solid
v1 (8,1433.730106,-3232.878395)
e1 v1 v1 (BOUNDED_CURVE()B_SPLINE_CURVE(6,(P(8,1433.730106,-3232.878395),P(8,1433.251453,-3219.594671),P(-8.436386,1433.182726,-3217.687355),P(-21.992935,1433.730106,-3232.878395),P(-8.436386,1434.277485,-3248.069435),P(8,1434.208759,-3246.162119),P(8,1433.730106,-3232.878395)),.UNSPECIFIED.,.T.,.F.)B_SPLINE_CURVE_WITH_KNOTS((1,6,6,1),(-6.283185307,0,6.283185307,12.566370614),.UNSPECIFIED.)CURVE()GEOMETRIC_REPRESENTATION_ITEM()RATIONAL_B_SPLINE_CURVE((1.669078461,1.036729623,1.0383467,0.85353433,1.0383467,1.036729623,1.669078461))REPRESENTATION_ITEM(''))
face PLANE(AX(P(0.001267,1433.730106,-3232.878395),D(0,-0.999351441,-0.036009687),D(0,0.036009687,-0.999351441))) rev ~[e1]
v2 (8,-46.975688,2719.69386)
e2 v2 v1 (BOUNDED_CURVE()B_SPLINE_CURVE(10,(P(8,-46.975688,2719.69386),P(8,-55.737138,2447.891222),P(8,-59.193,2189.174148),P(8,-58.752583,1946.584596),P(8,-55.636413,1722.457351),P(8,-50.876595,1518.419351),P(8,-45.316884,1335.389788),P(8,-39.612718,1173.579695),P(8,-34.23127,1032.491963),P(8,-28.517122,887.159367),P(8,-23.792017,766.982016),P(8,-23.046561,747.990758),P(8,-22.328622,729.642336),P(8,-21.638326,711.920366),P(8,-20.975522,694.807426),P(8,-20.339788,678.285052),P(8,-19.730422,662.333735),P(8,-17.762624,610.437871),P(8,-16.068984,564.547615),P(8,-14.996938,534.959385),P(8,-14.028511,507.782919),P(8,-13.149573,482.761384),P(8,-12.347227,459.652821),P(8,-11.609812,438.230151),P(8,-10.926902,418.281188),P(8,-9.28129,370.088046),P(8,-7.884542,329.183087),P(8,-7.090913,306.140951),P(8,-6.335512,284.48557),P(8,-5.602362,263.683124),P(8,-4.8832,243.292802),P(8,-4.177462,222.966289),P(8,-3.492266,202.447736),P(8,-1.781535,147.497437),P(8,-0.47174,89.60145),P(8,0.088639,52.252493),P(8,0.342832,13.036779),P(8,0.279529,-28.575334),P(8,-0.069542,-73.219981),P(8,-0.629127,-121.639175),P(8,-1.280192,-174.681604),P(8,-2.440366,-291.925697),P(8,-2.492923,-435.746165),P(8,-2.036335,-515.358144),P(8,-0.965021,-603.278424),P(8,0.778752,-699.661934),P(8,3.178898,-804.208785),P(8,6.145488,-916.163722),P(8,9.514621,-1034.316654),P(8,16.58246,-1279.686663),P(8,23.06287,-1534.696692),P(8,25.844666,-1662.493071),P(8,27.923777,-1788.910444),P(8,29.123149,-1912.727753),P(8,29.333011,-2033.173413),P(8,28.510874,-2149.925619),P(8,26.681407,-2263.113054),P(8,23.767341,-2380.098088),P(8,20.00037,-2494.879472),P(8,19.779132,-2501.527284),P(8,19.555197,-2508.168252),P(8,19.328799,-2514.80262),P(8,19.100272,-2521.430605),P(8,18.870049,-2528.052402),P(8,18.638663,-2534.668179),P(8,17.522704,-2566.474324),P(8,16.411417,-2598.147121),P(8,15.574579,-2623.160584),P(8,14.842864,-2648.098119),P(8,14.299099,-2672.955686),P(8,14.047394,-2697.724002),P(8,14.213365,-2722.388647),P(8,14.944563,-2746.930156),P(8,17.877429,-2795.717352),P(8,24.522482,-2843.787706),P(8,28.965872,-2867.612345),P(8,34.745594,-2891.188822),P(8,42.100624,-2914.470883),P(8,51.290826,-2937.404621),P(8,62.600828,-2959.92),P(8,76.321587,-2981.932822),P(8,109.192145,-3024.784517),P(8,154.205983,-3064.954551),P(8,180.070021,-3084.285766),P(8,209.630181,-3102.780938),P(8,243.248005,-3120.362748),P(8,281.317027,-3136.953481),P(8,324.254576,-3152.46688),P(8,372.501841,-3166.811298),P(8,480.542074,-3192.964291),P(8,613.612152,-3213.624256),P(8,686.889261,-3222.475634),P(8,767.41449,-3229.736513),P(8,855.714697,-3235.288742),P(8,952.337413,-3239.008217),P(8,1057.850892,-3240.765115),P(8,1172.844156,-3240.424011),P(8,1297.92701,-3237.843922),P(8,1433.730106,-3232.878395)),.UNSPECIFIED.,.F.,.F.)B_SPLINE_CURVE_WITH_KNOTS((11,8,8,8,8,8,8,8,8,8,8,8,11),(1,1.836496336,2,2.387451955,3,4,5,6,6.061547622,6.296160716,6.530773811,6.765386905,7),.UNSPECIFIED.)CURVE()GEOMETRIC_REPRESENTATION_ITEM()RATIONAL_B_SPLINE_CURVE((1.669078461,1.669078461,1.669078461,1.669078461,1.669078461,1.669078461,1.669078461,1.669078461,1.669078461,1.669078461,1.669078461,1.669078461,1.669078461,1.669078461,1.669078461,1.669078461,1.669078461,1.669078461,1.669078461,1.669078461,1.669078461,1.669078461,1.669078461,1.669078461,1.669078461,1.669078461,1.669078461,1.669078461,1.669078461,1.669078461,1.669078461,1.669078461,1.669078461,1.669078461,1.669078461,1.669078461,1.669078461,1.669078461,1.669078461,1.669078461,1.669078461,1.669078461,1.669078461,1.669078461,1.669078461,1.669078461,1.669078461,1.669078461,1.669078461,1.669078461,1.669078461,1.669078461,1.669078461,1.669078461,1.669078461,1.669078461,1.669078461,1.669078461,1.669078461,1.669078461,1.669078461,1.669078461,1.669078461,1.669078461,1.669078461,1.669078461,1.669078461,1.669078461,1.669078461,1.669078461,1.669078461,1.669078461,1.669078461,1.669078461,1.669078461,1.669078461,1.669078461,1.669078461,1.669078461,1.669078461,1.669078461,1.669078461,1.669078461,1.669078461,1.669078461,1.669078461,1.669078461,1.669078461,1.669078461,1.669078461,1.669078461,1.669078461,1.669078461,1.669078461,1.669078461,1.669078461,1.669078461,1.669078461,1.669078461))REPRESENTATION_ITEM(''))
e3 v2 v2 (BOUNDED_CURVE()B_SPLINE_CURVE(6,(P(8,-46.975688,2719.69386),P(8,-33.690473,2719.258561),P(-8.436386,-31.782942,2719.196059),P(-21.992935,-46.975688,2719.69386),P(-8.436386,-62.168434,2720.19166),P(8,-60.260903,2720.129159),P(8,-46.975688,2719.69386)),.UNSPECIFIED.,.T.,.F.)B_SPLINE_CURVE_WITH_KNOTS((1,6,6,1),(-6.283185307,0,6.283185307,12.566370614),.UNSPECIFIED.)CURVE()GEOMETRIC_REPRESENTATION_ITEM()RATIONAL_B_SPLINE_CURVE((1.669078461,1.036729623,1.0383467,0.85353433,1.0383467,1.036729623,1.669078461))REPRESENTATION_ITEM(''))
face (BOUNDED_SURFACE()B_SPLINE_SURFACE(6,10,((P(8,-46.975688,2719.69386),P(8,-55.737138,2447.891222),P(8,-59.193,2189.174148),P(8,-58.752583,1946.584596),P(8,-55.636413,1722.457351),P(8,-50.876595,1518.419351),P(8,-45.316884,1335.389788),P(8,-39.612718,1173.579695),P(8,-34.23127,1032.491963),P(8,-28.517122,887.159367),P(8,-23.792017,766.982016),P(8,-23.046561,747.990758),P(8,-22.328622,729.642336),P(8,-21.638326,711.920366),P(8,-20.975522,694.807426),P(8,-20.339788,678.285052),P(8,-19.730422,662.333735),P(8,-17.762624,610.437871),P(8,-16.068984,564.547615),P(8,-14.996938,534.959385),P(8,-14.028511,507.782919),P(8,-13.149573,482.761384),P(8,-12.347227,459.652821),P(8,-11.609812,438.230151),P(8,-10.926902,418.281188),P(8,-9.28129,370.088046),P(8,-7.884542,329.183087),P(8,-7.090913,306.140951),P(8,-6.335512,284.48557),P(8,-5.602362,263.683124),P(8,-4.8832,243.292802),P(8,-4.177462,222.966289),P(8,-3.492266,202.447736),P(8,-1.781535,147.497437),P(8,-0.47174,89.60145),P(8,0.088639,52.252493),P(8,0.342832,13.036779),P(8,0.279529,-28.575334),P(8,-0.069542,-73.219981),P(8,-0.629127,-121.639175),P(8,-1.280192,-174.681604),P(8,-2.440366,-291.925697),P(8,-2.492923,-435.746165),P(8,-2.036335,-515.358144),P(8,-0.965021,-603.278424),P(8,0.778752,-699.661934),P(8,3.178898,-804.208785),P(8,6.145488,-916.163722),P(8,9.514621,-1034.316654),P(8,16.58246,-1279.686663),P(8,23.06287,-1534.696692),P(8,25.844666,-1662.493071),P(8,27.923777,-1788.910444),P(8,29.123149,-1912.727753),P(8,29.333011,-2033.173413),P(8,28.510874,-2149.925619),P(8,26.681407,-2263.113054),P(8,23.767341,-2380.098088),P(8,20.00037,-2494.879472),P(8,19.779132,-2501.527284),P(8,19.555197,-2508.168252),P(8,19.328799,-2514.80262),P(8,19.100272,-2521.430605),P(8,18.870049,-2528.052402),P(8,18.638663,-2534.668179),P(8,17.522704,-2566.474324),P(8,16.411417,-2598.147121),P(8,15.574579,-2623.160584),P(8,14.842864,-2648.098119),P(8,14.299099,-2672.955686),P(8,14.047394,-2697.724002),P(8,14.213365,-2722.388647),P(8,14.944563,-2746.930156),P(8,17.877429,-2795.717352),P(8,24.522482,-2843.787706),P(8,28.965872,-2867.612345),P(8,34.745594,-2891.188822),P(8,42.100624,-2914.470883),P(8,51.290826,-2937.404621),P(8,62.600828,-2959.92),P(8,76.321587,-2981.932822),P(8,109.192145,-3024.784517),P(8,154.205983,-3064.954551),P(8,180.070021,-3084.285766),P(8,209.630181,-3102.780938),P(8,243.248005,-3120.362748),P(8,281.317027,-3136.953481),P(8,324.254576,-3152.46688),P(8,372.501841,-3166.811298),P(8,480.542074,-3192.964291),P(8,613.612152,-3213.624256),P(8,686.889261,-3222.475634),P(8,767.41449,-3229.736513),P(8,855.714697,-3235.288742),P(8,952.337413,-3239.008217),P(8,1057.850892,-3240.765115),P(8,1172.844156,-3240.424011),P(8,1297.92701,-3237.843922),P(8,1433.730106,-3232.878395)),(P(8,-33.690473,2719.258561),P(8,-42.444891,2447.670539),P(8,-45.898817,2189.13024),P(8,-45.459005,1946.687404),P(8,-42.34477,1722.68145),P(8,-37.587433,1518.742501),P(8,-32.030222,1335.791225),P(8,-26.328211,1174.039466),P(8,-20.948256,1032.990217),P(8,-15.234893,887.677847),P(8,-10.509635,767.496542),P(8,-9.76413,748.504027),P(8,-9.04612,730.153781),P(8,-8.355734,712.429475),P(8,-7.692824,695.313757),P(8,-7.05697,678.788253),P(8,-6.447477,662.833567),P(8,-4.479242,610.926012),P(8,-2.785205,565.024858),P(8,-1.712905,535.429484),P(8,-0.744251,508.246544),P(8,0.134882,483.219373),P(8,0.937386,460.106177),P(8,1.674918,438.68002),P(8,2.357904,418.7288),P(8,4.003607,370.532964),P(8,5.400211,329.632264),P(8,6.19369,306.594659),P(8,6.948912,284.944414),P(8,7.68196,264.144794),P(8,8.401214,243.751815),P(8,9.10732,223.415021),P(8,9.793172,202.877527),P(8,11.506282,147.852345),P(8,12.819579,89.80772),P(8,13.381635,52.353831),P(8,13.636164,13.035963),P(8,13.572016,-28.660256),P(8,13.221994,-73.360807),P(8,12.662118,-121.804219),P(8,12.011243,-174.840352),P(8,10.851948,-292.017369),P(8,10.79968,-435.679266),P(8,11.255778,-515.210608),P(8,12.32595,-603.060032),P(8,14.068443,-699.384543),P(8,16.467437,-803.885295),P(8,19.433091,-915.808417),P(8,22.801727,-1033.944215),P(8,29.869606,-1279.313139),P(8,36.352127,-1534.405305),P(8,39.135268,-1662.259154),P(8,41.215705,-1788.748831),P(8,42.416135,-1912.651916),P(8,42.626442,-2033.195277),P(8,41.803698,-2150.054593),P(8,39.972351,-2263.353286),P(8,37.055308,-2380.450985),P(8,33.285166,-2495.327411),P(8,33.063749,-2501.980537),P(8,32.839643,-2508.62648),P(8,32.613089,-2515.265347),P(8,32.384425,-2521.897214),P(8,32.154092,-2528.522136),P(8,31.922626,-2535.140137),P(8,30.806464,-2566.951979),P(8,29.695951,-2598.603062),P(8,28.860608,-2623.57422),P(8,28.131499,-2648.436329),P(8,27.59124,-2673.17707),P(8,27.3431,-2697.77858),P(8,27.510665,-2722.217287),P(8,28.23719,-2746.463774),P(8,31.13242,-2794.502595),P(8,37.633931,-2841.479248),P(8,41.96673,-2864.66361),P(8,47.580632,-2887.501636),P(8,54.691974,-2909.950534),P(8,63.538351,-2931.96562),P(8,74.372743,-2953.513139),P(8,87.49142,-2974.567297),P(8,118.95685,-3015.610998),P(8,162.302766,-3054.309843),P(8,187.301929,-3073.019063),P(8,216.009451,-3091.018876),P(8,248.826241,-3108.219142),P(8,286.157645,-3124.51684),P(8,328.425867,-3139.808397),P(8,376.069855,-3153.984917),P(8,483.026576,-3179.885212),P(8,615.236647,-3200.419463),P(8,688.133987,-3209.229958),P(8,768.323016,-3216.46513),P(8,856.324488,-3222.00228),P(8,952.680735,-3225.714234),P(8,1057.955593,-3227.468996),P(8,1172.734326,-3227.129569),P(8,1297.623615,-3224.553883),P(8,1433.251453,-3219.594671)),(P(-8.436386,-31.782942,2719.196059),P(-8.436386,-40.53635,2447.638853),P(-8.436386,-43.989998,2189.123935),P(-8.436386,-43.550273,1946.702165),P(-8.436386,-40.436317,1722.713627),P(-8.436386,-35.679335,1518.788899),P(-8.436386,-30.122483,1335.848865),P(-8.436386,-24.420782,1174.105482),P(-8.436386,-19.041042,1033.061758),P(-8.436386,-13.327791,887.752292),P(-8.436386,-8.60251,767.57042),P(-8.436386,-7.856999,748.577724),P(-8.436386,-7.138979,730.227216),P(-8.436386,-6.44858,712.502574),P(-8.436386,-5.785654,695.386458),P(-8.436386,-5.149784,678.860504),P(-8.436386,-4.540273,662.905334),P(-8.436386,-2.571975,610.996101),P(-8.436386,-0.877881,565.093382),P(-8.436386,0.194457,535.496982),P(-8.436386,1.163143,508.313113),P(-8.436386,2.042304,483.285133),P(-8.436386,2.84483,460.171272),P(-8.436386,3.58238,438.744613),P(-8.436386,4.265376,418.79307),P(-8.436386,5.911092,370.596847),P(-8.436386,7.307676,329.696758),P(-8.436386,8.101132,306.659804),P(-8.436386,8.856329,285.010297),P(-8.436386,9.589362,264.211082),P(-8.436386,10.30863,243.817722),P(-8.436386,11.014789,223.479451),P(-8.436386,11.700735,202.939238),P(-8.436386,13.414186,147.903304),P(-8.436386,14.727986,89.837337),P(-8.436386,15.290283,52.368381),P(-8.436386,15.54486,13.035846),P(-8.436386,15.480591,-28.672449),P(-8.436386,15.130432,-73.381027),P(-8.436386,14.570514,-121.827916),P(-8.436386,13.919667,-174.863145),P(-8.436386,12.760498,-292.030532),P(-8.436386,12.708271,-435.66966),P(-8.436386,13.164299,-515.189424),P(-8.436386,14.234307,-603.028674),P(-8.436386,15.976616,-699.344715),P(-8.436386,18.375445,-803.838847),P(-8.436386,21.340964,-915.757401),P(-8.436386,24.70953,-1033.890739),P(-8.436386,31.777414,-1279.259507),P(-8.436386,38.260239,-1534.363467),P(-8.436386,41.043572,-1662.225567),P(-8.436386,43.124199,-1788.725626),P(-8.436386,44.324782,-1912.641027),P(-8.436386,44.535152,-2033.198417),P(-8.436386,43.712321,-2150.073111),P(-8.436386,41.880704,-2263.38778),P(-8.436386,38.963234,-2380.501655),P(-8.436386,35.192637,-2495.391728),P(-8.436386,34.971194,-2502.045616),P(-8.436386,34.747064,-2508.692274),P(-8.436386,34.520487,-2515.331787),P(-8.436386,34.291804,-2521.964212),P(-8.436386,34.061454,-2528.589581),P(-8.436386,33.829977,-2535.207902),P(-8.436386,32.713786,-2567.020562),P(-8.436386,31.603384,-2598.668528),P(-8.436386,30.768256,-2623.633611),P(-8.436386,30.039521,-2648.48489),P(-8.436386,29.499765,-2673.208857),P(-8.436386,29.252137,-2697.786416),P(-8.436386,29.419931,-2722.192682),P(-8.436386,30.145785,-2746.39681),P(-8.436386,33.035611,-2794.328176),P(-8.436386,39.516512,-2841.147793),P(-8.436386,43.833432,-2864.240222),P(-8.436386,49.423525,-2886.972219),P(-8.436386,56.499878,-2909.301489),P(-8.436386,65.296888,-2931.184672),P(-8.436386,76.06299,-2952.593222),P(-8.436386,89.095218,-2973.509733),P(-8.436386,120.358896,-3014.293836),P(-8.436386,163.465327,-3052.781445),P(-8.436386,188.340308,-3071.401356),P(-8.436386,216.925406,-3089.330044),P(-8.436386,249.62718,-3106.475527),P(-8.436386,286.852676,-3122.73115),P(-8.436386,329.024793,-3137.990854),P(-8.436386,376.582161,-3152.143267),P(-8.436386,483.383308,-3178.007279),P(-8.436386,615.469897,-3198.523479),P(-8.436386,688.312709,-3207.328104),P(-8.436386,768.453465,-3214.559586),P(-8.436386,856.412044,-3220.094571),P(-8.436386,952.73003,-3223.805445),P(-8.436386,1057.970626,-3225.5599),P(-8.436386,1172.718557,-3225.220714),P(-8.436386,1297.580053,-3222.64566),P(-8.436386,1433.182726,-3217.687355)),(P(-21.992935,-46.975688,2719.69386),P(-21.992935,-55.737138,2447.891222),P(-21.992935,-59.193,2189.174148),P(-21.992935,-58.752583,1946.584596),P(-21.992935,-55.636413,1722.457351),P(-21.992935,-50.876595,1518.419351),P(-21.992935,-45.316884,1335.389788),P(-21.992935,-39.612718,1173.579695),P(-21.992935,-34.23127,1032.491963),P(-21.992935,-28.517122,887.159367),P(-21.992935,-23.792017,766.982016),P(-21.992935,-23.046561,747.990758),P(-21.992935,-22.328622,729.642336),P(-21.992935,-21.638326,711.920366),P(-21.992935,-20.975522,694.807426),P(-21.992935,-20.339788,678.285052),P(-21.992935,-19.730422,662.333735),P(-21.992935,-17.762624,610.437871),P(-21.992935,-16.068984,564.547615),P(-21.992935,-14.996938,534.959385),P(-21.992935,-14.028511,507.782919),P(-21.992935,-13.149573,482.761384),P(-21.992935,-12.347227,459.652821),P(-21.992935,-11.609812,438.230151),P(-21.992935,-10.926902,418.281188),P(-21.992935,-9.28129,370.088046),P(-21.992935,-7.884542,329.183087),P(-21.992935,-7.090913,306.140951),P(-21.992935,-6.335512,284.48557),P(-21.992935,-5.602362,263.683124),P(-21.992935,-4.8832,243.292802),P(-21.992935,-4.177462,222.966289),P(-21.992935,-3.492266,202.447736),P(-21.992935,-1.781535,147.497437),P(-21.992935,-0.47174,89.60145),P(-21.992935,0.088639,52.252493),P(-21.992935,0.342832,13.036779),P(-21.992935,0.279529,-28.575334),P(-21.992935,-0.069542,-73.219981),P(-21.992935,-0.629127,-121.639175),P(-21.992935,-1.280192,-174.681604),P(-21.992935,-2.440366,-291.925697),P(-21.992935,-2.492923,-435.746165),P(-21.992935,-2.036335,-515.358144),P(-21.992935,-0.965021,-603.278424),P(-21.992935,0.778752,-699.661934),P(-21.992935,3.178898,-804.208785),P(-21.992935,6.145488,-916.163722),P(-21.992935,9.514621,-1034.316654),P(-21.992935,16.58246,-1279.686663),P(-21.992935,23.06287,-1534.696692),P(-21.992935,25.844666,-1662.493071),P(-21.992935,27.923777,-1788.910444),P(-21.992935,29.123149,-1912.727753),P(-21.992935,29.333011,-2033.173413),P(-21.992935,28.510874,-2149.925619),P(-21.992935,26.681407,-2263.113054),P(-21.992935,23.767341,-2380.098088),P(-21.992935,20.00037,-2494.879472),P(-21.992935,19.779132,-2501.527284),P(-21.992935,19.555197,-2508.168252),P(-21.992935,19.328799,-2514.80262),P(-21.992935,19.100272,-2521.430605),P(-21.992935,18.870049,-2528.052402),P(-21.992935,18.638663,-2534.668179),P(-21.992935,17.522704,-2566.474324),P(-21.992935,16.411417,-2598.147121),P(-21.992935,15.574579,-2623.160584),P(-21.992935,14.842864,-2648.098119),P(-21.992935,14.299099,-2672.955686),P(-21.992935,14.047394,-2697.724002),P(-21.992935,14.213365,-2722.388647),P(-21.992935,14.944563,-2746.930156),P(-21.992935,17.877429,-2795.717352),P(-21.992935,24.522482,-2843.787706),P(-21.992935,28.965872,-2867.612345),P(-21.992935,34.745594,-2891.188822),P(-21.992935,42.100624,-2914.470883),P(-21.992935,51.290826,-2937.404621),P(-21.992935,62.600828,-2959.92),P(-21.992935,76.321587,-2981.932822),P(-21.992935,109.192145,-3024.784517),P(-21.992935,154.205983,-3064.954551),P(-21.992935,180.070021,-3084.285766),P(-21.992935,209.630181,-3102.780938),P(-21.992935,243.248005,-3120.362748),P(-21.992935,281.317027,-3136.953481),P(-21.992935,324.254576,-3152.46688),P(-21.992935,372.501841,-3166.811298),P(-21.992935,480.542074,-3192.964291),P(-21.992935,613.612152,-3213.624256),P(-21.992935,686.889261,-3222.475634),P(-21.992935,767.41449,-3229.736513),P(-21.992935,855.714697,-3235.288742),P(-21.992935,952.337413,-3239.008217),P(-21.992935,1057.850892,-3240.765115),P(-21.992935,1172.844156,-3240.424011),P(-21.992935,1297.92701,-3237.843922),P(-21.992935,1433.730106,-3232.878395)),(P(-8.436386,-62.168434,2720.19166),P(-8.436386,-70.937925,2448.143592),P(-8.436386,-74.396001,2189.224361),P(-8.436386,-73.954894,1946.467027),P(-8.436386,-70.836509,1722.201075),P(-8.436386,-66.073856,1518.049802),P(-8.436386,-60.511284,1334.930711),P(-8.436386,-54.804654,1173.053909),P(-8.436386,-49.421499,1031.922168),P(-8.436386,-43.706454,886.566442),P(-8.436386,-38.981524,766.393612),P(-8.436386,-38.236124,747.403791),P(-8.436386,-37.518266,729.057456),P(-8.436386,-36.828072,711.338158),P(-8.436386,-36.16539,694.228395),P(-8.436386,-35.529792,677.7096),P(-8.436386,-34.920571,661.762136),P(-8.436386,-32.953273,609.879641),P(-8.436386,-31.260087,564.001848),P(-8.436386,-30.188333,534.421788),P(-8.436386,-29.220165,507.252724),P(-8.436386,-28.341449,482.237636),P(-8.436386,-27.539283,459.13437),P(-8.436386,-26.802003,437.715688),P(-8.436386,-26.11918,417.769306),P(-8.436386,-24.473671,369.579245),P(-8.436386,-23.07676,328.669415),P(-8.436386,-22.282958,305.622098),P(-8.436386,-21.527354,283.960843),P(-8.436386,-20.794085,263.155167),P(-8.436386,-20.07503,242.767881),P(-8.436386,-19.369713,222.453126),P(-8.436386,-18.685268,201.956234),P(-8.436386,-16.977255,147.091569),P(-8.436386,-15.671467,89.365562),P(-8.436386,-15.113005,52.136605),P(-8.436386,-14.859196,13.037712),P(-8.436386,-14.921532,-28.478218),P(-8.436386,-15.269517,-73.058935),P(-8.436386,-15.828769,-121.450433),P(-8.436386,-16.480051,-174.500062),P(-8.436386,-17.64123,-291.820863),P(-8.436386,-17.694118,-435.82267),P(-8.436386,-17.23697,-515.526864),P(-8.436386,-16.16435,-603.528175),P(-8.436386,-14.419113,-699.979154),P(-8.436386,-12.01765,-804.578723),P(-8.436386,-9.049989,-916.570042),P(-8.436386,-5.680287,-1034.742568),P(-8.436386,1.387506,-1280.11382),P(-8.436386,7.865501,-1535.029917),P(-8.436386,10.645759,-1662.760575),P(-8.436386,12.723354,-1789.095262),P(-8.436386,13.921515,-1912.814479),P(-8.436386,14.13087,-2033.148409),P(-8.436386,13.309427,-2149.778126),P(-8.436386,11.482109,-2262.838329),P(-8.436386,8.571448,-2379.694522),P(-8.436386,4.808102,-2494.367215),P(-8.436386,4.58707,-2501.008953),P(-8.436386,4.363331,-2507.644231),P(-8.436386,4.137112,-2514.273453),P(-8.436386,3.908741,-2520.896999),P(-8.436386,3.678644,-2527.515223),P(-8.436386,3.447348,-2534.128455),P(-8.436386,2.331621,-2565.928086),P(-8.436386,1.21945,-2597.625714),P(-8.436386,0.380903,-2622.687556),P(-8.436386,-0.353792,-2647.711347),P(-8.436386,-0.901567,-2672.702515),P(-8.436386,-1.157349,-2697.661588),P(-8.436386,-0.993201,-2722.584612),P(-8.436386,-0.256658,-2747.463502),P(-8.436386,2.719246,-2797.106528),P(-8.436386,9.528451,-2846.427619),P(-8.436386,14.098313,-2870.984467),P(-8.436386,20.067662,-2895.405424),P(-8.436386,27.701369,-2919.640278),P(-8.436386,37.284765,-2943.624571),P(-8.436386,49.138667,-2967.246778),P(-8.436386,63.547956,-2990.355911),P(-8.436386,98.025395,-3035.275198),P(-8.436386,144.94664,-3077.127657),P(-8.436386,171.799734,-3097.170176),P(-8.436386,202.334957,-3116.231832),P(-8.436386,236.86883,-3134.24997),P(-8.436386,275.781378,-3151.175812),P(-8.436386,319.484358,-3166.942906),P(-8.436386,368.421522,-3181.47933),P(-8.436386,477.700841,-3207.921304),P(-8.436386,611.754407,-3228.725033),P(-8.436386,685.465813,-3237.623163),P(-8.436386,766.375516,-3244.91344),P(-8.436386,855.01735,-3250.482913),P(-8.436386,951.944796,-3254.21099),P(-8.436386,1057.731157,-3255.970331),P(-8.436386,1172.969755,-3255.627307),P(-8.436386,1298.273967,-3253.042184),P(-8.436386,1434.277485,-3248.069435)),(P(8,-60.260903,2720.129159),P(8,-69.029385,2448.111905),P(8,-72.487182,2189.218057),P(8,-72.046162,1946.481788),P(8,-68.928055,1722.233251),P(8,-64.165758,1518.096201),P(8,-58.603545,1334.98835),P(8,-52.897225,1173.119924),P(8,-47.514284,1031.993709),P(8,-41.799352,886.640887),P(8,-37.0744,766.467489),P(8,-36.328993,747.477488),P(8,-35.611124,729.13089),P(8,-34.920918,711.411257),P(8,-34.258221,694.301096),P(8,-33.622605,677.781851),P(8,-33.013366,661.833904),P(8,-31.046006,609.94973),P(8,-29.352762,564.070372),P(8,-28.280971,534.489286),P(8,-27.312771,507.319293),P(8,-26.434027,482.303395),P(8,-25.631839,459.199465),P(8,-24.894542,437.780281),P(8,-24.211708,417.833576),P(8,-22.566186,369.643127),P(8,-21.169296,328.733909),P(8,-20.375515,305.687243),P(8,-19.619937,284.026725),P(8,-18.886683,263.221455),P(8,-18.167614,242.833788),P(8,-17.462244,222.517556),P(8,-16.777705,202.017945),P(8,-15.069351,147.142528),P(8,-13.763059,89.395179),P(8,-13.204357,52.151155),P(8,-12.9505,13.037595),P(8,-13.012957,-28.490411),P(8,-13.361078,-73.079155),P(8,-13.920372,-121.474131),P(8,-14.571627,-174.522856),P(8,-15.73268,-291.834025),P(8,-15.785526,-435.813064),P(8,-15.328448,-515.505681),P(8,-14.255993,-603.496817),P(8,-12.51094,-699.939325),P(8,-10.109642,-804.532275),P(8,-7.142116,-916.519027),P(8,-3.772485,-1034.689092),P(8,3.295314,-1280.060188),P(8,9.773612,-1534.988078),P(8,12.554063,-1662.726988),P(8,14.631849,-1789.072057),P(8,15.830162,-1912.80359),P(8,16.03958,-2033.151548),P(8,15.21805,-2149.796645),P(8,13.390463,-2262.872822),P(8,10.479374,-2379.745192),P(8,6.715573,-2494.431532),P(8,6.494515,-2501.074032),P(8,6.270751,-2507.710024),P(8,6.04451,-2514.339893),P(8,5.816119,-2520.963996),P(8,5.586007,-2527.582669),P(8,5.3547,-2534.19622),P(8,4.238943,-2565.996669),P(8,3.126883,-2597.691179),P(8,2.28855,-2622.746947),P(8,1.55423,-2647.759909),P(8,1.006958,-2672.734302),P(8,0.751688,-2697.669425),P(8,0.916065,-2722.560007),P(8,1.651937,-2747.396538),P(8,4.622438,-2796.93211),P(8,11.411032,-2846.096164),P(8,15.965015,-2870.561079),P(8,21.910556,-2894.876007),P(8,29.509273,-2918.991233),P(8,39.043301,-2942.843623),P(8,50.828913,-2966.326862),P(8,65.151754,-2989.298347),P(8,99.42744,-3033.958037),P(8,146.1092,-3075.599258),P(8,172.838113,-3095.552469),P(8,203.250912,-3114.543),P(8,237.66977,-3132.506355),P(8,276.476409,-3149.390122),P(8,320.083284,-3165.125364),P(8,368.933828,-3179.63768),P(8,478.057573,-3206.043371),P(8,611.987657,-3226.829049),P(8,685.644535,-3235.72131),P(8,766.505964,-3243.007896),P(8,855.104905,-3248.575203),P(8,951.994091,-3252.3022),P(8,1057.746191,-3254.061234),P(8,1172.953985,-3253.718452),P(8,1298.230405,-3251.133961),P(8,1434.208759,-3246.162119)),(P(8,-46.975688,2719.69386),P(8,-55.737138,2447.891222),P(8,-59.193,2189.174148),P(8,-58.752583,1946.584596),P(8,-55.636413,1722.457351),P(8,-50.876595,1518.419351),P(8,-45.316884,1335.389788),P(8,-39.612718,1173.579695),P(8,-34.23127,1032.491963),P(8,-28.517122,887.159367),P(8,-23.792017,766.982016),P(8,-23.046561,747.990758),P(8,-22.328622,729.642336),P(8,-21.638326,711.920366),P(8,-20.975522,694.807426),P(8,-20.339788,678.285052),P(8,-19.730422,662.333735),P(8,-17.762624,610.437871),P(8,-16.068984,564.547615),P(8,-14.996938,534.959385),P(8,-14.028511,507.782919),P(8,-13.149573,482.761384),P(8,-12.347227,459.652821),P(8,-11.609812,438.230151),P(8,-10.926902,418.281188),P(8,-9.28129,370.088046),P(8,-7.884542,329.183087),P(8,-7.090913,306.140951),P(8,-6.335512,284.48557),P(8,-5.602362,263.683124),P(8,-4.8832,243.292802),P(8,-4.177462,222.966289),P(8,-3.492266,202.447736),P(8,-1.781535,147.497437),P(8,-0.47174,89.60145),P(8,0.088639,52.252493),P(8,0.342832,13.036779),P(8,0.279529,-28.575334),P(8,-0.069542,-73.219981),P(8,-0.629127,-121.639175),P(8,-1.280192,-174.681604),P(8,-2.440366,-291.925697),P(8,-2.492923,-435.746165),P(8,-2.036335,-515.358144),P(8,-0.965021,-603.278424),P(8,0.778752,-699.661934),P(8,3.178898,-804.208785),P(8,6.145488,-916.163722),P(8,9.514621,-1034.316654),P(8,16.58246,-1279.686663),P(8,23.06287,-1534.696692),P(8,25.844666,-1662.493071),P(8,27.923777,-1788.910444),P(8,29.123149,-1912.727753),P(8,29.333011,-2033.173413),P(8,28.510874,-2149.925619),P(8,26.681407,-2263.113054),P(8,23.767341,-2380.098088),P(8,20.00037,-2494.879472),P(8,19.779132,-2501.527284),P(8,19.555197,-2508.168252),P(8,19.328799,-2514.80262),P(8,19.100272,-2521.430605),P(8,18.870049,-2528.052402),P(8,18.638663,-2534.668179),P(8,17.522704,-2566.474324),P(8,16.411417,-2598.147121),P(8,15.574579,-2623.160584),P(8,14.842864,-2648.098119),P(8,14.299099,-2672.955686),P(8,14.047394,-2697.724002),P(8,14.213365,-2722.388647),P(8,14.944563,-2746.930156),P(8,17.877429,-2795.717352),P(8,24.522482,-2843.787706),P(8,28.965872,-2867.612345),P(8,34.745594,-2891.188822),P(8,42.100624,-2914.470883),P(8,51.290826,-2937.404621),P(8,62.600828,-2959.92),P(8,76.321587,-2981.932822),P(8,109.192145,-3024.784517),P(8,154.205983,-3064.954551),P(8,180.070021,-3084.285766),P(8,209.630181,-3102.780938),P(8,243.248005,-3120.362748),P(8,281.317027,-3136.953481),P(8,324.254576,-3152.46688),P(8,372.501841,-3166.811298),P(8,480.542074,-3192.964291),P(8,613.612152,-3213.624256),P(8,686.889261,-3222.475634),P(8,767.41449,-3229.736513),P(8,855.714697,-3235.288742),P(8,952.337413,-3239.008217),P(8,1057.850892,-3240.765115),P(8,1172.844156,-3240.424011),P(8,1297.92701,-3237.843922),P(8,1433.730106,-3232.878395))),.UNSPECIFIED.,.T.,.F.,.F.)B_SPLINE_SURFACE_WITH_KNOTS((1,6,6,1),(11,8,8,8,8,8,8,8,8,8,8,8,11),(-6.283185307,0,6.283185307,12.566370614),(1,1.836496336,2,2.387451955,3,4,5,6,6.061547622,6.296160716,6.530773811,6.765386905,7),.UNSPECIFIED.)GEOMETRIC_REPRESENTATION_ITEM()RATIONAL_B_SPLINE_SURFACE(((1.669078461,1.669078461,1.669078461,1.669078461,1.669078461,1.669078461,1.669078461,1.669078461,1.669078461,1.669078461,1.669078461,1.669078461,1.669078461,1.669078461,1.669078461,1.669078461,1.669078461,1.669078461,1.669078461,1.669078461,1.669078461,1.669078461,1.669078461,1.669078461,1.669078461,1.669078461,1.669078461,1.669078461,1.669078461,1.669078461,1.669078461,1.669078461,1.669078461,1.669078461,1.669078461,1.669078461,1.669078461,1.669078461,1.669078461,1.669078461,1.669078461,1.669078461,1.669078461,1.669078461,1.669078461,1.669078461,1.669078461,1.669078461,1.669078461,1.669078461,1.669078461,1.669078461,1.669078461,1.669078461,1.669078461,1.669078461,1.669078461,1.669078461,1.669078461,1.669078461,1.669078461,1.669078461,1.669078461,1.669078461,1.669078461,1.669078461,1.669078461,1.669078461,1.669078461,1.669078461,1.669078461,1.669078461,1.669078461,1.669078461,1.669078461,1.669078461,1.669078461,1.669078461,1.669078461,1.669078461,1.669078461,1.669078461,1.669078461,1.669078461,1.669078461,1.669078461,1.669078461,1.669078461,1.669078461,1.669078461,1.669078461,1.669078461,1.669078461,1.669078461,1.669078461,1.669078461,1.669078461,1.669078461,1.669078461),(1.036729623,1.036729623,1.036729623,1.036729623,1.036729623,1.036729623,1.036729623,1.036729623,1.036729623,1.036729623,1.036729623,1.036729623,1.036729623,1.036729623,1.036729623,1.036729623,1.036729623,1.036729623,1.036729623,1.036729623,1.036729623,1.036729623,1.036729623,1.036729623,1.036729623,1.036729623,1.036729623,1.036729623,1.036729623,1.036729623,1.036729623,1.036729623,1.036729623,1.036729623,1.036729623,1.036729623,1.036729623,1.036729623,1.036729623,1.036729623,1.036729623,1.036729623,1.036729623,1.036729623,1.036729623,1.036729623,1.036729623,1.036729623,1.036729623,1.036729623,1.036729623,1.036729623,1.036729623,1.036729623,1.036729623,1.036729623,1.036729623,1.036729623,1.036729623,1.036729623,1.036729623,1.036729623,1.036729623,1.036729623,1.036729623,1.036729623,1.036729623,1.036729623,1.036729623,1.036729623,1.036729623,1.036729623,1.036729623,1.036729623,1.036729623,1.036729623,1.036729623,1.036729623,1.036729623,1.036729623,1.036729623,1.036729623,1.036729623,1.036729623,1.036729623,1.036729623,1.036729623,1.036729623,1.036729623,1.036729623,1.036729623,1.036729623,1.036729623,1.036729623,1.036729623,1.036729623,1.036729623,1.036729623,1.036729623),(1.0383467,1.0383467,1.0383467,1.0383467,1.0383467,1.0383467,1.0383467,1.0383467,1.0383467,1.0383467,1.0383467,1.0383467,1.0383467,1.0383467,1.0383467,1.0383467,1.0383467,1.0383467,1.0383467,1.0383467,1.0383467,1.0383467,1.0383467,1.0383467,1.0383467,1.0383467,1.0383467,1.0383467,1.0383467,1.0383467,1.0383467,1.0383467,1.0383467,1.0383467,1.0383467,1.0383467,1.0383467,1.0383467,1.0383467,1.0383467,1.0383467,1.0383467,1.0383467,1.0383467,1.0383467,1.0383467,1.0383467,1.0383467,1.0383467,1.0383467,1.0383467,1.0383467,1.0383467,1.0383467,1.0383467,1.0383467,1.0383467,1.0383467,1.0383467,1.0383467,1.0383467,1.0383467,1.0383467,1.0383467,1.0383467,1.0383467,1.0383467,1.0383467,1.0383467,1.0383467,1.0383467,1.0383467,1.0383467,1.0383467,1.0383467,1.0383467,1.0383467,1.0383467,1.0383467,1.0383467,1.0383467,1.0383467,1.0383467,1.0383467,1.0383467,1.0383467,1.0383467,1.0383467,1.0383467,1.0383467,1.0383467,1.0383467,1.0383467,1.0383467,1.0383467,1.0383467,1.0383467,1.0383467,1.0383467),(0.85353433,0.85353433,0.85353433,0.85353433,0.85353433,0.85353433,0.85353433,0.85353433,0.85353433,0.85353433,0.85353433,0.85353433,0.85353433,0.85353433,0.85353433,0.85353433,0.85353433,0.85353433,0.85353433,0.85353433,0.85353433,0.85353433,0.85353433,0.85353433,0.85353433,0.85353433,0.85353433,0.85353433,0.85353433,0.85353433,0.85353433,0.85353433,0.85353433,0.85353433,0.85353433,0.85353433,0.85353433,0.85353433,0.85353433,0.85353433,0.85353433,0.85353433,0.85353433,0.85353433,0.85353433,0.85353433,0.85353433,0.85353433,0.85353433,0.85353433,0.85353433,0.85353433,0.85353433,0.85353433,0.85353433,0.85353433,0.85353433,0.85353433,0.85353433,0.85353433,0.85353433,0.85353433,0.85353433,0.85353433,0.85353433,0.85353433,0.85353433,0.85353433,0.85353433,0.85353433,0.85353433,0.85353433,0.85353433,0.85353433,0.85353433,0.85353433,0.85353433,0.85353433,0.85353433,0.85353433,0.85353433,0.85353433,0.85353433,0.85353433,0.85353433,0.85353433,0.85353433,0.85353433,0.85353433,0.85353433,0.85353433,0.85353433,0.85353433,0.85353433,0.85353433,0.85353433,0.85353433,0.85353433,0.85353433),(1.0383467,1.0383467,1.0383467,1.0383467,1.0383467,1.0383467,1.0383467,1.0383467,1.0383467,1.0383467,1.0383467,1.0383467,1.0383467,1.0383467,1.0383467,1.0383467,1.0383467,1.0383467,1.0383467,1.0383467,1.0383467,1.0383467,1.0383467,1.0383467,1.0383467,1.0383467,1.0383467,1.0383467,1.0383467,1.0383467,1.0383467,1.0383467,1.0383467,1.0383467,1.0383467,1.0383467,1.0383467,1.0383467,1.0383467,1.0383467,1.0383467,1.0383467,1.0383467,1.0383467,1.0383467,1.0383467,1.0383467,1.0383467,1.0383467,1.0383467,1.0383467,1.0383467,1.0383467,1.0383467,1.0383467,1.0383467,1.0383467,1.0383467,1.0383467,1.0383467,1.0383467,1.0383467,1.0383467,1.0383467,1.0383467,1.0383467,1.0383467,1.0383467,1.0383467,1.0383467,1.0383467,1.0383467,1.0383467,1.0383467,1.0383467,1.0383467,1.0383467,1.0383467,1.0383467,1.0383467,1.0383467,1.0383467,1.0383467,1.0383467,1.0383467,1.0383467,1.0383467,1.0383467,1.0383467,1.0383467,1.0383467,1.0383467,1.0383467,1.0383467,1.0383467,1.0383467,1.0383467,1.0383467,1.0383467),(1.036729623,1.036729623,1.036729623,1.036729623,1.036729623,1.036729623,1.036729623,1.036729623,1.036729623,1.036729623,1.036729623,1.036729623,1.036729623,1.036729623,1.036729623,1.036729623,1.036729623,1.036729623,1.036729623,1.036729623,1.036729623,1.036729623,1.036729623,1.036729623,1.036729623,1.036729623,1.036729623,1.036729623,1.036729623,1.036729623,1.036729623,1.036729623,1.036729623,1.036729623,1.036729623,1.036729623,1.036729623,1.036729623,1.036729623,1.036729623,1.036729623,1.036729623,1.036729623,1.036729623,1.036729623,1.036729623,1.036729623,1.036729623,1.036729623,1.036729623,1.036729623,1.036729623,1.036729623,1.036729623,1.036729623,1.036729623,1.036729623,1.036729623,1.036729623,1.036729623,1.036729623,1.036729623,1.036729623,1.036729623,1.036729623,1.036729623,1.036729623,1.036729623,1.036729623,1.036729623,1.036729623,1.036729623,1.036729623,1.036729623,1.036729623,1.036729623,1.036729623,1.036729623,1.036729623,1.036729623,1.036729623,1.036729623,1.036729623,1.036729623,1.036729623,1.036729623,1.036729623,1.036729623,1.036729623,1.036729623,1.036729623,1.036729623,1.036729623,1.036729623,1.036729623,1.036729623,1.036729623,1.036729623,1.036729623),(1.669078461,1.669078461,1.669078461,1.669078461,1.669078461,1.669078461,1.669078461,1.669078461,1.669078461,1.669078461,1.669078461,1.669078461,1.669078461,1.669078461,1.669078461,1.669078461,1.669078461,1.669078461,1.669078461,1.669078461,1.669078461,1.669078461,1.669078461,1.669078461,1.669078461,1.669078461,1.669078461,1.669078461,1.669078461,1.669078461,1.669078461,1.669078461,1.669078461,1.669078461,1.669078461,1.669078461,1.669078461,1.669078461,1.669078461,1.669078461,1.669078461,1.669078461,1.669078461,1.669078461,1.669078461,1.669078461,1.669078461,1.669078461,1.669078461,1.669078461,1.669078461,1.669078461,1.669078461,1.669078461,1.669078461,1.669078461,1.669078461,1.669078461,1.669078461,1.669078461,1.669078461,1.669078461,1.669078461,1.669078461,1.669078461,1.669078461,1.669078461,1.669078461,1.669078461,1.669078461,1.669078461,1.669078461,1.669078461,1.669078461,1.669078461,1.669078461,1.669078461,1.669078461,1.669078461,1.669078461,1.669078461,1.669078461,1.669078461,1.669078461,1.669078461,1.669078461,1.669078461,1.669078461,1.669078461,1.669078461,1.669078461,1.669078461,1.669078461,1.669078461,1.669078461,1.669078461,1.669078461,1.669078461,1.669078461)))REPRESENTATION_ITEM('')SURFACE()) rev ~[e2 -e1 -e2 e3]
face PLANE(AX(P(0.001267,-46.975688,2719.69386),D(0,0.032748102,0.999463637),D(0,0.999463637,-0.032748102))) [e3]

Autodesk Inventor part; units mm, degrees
ref_plane "YZ Plane" through (0, 0, 0) normal (1, 0, 0) x (0, 1, 0)
ref_plane "XZ Plane" through (0, 0, 0) normal (0, 1, 0) x (-1, 0, 0)
ref_plane "XY Plane" through (0, 0, 0) normal (0, 0, 1) x (1, 0, 0)
sketch "Sketch1" plane through (0, 0, 0) normal (1, 0, 0) x (0, 1, 0)
  line L0 (-41.6909, 2719.5207) -> (-67.8675, 1907.4512) construction
  line L1 (-67.8675, 1907.4512) -> (-6.5285, 563.5042) construction
  line L2 (-6.5285, 563.5042) -> (-6.5285, 324.5897) construction
  line L3 (-6.5285, 324.5897) -> (14.9092, 13.411) construction
  line L4 (14.9092, 13.411) -> (-12.8137, -511.0804) construction
  line L5 (-12.8137, -511.0804) -> (58.4562, -2016.5581) construction
  line L6 (58.4562, -2016.5581) -> (17.8661, -2736.3946) construction
  line L7 (17.8661, -2736.3946) -> (-12.8137, -3280.4793) construction
  line L8 (-12.8137, -3280.4793) -> (1433.5397, -3227.5942) construction
  spline S0 degree 4 poles (-41.6909, 2719.5207) (-67.8675, 1907.4512) (-6.5285, 563.5042) (-6.5285, 324.5897) (14.9092, 13.411) (-12.8137, -511.0804) (58.4562, -2016.5581) (17.8661, -2736.3946) (-12.8137, -3280.4793) (1433.5397, -3227.5942) knots 1 1 1 1 1 2 3 4 5 6 7 7 7 7 7
  point P0 (0, 0)
  dimension "d1" = 6000
sketch "Sketch2" plane through (0, 0, 0) normal (0, 0, 1) x (1, 0, 0)
  circle A0 centre (0, 0) radius 8
  dimension "d0" = 16
sweep "Sweep1" add profiles "Sketch2" path "Sketch1"
properties part number "PowerCable"
